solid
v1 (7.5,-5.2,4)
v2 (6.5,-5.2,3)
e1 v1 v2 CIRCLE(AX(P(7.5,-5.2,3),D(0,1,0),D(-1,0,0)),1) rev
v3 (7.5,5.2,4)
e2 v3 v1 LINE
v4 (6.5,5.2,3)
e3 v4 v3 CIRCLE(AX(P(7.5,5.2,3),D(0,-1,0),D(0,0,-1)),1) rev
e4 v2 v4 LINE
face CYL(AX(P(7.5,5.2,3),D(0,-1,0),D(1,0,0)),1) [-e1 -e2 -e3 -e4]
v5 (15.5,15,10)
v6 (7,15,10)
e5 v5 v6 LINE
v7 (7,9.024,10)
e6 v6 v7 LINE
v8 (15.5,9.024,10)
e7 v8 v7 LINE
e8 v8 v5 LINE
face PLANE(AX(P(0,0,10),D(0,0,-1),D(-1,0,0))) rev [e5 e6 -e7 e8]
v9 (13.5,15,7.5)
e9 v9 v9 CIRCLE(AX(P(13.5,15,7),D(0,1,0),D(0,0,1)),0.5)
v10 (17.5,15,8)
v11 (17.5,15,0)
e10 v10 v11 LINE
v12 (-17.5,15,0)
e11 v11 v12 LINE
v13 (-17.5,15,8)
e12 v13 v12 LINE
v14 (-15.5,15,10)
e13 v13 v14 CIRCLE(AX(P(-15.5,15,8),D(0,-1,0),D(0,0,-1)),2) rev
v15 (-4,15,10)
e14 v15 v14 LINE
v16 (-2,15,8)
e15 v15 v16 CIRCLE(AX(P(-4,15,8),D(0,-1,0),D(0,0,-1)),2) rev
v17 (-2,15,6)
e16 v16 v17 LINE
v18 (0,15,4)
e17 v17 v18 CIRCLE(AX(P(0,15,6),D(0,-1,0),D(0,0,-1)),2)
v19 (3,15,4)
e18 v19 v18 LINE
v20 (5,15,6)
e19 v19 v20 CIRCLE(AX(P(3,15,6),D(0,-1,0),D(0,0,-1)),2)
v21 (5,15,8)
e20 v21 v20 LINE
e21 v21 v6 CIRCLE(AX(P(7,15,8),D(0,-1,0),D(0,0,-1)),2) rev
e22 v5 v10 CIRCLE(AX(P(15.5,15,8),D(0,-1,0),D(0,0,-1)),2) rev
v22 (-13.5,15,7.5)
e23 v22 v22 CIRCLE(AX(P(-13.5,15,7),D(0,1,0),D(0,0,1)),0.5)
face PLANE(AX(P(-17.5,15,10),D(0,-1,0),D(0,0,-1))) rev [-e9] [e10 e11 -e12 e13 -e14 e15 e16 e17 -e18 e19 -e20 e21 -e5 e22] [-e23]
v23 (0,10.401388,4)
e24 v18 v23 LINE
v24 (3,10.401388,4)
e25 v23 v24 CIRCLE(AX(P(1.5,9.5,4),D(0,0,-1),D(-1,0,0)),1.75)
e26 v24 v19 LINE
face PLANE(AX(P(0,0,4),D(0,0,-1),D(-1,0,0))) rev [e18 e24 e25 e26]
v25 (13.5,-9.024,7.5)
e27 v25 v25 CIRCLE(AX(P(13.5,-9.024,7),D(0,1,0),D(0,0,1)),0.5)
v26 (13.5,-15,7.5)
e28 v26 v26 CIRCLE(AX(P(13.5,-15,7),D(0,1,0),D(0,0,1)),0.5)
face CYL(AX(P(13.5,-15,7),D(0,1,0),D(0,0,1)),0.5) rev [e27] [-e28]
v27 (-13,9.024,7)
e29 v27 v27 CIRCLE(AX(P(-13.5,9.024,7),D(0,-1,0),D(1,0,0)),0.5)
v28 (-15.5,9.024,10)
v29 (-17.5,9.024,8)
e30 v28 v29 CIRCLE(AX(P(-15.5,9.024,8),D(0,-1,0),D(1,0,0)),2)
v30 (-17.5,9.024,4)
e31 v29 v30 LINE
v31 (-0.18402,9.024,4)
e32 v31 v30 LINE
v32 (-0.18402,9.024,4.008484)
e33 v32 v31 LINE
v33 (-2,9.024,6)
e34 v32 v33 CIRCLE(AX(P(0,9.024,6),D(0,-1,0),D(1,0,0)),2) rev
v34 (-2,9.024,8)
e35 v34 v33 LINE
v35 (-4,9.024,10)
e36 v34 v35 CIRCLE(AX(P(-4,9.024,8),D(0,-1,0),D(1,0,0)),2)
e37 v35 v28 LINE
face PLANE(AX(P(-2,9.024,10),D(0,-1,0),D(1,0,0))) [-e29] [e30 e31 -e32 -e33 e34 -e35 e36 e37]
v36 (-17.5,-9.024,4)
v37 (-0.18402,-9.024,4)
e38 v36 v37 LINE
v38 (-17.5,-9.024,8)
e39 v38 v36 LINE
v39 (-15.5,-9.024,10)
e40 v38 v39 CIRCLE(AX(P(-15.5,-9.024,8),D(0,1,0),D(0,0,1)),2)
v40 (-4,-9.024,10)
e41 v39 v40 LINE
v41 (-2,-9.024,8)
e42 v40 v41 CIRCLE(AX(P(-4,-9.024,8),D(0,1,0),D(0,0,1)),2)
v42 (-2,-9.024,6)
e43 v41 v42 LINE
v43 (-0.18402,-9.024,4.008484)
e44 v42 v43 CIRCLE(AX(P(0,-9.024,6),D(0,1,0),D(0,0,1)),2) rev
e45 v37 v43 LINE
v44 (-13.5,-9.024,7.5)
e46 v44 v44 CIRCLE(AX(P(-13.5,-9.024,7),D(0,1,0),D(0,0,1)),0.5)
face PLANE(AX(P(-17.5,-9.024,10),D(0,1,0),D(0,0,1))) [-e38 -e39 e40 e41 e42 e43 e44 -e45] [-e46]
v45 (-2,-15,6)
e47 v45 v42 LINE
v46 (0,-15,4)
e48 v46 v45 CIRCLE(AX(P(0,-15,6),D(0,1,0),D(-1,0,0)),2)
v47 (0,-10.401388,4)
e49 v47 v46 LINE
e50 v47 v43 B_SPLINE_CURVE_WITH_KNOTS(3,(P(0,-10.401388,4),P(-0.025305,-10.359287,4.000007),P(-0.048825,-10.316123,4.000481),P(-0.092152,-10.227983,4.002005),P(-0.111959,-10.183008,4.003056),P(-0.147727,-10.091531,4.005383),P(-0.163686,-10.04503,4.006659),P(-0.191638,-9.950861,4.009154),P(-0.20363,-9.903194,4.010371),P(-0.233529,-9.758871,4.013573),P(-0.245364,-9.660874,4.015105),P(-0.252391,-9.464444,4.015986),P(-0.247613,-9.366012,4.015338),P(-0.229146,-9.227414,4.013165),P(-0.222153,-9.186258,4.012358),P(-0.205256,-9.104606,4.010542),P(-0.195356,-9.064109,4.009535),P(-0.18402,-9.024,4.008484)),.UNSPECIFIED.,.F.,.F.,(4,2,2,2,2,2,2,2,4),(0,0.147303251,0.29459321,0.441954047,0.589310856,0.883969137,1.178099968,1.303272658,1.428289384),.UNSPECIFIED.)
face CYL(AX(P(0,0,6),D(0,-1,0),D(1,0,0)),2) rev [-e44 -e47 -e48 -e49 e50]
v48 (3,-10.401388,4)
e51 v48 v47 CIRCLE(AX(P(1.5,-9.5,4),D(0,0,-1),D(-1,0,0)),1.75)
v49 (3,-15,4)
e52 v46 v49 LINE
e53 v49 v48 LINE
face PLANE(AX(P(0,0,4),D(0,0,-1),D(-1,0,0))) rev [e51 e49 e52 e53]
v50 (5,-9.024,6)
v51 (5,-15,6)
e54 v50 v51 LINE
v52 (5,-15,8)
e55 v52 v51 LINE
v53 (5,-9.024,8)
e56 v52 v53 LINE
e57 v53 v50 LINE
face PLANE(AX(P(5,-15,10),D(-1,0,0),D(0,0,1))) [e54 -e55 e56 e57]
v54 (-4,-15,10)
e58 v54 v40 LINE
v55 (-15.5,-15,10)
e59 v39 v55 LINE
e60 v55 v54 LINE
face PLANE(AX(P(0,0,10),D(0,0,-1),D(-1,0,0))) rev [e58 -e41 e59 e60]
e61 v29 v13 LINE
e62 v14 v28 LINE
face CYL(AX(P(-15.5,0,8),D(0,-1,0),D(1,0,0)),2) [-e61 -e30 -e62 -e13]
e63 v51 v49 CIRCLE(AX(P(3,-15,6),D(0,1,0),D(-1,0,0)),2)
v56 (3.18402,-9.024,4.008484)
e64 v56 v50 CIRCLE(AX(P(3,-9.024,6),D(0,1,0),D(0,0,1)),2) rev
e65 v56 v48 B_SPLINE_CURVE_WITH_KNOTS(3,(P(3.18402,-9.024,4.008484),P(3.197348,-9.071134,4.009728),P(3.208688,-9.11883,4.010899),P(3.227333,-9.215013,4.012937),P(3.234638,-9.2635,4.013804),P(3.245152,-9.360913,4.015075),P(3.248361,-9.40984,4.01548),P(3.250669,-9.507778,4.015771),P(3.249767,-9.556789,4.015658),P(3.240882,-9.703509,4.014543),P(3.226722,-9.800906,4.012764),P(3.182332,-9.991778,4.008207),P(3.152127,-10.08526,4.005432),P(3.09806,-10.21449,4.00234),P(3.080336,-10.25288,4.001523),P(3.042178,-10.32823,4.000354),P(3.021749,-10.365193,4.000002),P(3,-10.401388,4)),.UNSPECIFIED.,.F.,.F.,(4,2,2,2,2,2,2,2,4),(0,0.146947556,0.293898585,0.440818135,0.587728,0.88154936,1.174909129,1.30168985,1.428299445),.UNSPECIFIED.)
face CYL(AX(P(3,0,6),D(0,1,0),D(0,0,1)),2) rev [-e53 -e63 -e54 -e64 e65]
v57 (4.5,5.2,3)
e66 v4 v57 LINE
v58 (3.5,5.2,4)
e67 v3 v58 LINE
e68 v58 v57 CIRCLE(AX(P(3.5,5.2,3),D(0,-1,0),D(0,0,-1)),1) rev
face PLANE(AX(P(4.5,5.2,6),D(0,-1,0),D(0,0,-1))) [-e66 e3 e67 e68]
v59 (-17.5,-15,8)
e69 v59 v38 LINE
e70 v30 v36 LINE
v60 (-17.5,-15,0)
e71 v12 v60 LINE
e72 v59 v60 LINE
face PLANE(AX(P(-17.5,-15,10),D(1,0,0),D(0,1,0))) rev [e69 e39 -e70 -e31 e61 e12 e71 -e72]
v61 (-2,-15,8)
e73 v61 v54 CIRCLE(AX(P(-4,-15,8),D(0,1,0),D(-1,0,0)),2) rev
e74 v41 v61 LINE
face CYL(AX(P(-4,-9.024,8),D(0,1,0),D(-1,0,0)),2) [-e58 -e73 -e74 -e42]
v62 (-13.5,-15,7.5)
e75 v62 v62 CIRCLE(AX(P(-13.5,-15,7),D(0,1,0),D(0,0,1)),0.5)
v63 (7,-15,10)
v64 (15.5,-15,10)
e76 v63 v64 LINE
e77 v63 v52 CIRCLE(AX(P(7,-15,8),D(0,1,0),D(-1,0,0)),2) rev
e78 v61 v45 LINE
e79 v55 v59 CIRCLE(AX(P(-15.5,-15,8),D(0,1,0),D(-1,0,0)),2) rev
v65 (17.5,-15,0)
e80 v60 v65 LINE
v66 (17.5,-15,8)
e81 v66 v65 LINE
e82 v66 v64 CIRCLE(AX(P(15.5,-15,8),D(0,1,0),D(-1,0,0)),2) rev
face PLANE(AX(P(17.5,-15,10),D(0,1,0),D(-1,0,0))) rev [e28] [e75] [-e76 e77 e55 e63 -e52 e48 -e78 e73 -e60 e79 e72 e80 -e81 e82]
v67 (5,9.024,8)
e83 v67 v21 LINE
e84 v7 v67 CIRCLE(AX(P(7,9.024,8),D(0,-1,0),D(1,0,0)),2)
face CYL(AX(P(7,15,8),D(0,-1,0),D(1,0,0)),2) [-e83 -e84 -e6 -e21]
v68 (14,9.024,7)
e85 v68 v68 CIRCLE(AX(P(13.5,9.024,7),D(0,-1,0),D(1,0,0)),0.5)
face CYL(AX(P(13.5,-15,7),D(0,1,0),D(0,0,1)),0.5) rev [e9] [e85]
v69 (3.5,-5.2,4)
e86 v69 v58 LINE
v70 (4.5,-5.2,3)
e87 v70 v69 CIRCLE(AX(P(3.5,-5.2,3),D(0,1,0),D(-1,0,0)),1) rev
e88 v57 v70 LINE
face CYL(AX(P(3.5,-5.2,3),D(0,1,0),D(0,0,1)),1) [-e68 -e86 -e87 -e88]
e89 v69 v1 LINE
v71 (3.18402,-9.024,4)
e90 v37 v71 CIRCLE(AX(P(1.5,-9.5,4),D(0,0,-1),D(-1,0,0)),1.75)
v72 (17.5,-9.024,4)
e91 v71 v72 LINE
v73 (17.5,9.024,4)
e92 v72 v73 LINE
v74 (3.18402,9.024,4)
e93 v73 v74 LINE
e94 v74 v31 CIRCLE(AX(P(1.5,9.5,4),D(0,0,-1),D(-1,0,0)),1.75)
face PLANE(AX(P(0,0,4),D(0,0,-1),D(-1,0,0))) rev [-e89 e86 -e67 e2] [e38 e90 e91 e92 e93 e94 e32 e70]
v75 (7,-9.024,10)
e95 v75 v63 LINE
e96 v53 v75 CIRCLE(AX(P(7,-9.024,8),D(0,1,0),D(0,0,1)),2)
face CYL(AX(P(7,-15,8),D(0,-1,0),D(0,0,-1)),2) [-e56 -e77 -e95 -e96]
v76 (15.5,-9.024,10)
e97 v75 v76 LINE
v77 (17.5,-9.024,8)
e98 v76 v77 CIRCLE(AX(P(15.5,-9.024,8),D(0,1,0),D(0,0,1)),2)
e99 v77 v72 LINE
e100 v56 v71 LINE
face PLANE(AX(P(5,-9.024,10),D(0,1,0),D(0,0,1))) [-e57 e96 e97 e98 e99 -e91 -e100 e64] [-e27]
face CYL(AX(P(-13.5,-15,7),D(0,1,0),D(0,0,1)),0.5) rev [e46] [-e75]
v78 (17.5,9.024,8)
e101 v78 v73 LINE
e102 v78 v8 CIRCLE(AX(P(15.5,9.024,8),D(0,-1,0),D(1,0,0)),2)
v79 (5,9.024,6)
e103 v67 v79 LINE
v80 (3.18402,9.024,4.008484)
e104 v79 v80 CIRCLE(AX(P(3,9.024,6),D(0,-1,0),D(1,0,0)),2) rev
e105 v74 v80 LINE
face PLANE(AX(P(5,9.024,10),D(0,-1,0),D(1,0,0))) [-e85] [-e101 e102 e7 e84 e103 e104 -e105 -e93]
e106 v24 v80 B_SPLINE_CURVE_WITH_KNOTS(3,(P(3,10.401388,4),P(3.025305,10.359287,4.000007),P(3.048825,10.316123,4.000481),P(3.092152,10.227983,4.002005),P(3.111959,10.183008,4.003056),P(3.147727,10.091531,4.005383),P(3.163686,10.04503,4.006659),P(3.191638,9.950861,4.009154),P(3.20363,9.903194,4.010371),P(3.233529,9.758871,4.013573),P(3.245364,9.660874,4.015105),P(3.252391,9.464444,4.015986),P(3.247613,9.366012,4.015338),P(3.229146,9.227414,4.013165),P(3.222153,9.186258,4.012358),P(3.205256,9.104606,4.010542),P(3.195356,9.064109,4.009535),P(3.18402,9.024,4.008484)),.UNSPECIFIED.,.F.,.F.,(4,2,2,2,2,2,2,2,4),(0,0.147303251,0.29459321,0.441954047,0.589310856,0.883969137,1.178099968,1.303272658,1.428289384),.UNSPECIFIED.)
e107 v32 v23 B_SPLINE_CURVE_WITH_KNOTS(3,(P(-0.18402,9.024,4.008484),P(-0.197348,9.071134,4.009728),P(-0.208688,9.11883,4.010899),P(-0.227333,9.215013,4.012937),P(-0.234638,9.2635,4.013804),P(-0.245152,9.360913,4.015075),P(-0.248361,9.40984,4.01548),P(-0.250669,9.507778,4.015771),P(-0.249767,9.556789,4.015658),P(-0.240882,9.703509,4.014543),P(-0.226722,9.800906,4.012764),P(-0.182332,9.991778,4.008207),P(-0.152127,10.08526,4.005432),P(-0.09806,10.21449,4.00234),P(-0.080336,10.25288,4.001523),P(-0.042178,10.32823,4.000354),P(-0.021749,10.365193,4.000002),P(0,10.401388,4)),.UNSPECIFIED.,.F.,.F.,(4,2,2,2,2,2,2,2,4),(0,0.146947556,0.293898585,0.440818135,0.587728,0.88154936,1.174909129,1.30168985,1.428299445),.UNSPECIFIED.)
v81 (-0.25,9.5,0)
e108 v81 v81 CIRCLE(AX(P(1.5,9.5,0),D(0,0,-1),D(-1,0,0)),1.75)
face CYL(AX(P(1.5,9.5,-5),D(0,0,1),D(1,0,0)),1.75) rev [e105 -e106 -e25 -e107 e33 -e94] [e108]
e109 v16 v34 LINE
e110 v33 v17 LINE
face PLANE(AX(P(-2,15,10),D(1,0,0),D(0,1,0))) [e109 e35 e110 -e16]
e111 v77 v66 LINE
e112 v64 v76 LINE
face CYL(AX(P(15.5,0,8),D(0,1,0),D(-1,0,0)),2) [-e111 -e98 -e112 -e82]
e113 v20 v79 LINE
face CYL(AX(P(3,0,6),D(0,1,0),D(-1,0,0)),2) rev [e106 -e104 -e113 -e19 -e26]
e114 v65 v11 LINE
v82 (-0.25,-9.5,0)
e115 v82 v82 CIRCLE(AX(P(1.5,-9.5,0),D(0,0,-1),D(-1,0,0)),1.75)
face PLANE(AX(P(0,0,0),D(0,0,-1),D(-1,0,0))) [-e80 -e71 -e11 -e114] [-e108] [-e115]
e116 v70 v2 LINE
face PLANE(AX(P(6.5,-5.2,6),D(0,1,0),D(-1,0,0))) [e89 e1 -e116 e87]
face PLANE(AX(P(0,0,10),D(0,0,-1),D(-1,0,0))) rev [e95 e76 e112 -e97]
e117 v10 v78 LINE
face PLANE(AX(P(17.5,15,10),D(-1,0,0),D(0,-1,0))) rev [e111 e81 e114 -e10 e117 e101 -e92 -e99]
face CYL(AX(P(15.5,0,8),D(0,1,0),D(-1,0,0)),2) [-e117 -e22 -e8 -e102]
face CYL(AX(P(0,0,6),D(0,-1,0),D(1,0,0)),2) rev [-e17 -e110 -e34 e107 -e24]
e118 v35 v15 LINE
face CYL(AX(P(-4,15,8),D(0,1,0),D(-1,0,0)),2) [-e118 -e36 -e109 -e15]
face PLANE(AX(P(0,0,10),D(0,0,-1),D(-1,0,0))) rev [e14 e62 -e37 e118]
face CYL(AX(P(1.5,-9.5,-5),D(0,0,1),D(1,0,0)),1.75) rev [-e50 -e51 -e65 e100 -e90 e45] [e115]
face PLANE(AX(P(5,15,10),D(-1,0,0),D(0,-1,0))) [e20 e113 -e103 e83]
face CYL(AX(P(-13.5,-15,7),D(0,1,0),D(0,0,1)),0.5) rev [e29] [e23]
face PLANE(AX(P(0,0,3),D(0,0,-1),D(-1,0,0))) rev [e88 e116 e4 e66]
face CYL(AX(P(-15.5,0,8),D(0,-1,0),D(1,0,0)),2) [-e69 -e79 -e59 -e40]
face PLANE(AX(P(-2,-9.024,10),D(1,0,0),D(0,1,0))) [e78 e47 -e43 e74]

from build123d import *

# Parameters (mm, degrees)
SKETCHBUTTOM_W                   = 35
SKETCHBUTTOM_H                   = 30
BOSSEXTRUDEBUTTOM_DEPTH          = 10
CUTEXTRUDEFINGERROOM_START       = 4
CUTEXTRUDEFINGERROOM_DEPTH       = 6
FILLETTOP_R                      = 2
CUTEXTRUDEFINGERSHAFT_DEPTH      = 26.124689053
CUTEXTRUDEFINGERSHAFT_DEPTH_BACK = 26.124689053
SKETCHFINGERSHAFT_R              = 0.5
CUTEXTRUDESENSORROOM_START       = 3
SKETCH12_W                       = 2
SKETCH12_H                       = 10.4
CUTEXTRUDESENSORROOM_DEPTH       = 3
FILLETSENSORROOM_R               = 1
SKETCHFIXTUREHOLES_R             = 1.75
CUTEXTRUDEFIXTUREHOLES_DEPTH     = 5


with BuildPart() as part:
    # SketchButtom → BossExtrudeButtom (new body)
    with BuildSketch(Plane.XY):
        Rectangle(SKETCHBUTTOM_W, SKETCHBUTTOM_H)
    extrude(amount=BOSSEXTRUDEBUTTOM_DEPTH)

    # SketchFingerRoom → CutExtrudeFingerRoom (cut)
    with BuildSketch(Plane.XY.offset(CUTEXTRUDEFINGERROOM_START)):
        Polygon((5, 9.024), (17.5, 9.024), (17.5, -9.024), (5, -9.024), (5, -15), (-2, -15), (-2, -9.024), (-17.5, -9.024), (-17.5, 9.024), (-2, 9.024), (-2, 15), (5, 15), align=None)
    extrude(amount=CUTEXTRUDEFINGERROOM_DEPTH, mode=Mode.SUBTRACT)

    # FilletTop
    fillettop_edges = [part.edges().sort_by_distance(p)[0] for p in [
        (17.5, -12.012, 10),
        (-17.5, -12.012, 10),
        (17.5, 12.012, 10),
        (-2, 12.012, 4),
        (-2, -12.012, 4),
        (5, -12.012, 4),
        (5, 12.012, 4),
        (-2, 12.012, 10),
        (-2, -12.012, 10),
        (5, -12.012, 10),
        (5, 12.012, 10),
        (-17.5, 12.012, 10),
    ]]
    fillet(fillettop_edges, radius=FILLETTOP_R)

    # SketchFingerShaft → CutExtrudeFingerShaft (cut, two sides: drawn at the far end of the back side and taken through both)
    with BuildSketch(Plane(origin=(0, 0, 0), x_dir=(1, 0, 0), z_dir=(0, 1, 0)).offset(-CUTEXTRUDEFINGERSHAFT_DEPTH_BACK)):
        with Locations(Location((-13.5, -7, 0), (0, 0, 270))):
            Circle(SKETCHFINGERSHAFT_R)
        with Locations(Location((13.5, -7, 0), (0, 0, 270))):
            Circle(SKETCHFINGERSHAFT_R)
    extrude(amount=CUTEXTRUDEFINGERSHAFT_DEPTH + CUTEXTRUDEFINGERSHAFT_DEPTH_BACK, mode=Mode.SUBTRACT)

    # Sketch12 → CutExtrudeSensorRoom (cut)
    with BuildSketch(Plane.XY.offset(CUTEXTRUDESENSORROOM_START)):
        with Locations((5.5, 0)):
            Rectangle(SKETCH12_W, SKETCH12_H)
    extrude(amount=CUTEXTRUDESENSORROOM_DEPTH, mode=Mode.SUBTRACT)

    # FilletSensorRoom
    filletsensorroom_edges = [part.edges().sort_by_distance(p)[0] for p in [
        (4.5, 0, 4),
        (6.5, 0, 4),
    ]]
    fillet(filletsensorroom_edges, radius=FILLETSENSORROOM_R - 0.0001)  # a hair under: the kernel refuses the full size

    # SketchFixtureHoles → CutExtrudeFixtureHoles (cut, symmetric)
    with BuildSketch(Plane.XY):
        with Locations(Location((1.5, -9.5, 0), (0, 0, 15.783313229))):
            Circle(SKETCHFIXTUREHOLES_R)
        with Locations(Location((1.5, 9.5, 0), (0, 0, 344.216686771))):
            Circle(SKETCHFIXTUREHOLES_R)
    extrude(amount=CUTEXTRUDEFIXTUREHOLES_DEPTH, both=True, mode=Mode.SUBTRACT)


solid = part.part
